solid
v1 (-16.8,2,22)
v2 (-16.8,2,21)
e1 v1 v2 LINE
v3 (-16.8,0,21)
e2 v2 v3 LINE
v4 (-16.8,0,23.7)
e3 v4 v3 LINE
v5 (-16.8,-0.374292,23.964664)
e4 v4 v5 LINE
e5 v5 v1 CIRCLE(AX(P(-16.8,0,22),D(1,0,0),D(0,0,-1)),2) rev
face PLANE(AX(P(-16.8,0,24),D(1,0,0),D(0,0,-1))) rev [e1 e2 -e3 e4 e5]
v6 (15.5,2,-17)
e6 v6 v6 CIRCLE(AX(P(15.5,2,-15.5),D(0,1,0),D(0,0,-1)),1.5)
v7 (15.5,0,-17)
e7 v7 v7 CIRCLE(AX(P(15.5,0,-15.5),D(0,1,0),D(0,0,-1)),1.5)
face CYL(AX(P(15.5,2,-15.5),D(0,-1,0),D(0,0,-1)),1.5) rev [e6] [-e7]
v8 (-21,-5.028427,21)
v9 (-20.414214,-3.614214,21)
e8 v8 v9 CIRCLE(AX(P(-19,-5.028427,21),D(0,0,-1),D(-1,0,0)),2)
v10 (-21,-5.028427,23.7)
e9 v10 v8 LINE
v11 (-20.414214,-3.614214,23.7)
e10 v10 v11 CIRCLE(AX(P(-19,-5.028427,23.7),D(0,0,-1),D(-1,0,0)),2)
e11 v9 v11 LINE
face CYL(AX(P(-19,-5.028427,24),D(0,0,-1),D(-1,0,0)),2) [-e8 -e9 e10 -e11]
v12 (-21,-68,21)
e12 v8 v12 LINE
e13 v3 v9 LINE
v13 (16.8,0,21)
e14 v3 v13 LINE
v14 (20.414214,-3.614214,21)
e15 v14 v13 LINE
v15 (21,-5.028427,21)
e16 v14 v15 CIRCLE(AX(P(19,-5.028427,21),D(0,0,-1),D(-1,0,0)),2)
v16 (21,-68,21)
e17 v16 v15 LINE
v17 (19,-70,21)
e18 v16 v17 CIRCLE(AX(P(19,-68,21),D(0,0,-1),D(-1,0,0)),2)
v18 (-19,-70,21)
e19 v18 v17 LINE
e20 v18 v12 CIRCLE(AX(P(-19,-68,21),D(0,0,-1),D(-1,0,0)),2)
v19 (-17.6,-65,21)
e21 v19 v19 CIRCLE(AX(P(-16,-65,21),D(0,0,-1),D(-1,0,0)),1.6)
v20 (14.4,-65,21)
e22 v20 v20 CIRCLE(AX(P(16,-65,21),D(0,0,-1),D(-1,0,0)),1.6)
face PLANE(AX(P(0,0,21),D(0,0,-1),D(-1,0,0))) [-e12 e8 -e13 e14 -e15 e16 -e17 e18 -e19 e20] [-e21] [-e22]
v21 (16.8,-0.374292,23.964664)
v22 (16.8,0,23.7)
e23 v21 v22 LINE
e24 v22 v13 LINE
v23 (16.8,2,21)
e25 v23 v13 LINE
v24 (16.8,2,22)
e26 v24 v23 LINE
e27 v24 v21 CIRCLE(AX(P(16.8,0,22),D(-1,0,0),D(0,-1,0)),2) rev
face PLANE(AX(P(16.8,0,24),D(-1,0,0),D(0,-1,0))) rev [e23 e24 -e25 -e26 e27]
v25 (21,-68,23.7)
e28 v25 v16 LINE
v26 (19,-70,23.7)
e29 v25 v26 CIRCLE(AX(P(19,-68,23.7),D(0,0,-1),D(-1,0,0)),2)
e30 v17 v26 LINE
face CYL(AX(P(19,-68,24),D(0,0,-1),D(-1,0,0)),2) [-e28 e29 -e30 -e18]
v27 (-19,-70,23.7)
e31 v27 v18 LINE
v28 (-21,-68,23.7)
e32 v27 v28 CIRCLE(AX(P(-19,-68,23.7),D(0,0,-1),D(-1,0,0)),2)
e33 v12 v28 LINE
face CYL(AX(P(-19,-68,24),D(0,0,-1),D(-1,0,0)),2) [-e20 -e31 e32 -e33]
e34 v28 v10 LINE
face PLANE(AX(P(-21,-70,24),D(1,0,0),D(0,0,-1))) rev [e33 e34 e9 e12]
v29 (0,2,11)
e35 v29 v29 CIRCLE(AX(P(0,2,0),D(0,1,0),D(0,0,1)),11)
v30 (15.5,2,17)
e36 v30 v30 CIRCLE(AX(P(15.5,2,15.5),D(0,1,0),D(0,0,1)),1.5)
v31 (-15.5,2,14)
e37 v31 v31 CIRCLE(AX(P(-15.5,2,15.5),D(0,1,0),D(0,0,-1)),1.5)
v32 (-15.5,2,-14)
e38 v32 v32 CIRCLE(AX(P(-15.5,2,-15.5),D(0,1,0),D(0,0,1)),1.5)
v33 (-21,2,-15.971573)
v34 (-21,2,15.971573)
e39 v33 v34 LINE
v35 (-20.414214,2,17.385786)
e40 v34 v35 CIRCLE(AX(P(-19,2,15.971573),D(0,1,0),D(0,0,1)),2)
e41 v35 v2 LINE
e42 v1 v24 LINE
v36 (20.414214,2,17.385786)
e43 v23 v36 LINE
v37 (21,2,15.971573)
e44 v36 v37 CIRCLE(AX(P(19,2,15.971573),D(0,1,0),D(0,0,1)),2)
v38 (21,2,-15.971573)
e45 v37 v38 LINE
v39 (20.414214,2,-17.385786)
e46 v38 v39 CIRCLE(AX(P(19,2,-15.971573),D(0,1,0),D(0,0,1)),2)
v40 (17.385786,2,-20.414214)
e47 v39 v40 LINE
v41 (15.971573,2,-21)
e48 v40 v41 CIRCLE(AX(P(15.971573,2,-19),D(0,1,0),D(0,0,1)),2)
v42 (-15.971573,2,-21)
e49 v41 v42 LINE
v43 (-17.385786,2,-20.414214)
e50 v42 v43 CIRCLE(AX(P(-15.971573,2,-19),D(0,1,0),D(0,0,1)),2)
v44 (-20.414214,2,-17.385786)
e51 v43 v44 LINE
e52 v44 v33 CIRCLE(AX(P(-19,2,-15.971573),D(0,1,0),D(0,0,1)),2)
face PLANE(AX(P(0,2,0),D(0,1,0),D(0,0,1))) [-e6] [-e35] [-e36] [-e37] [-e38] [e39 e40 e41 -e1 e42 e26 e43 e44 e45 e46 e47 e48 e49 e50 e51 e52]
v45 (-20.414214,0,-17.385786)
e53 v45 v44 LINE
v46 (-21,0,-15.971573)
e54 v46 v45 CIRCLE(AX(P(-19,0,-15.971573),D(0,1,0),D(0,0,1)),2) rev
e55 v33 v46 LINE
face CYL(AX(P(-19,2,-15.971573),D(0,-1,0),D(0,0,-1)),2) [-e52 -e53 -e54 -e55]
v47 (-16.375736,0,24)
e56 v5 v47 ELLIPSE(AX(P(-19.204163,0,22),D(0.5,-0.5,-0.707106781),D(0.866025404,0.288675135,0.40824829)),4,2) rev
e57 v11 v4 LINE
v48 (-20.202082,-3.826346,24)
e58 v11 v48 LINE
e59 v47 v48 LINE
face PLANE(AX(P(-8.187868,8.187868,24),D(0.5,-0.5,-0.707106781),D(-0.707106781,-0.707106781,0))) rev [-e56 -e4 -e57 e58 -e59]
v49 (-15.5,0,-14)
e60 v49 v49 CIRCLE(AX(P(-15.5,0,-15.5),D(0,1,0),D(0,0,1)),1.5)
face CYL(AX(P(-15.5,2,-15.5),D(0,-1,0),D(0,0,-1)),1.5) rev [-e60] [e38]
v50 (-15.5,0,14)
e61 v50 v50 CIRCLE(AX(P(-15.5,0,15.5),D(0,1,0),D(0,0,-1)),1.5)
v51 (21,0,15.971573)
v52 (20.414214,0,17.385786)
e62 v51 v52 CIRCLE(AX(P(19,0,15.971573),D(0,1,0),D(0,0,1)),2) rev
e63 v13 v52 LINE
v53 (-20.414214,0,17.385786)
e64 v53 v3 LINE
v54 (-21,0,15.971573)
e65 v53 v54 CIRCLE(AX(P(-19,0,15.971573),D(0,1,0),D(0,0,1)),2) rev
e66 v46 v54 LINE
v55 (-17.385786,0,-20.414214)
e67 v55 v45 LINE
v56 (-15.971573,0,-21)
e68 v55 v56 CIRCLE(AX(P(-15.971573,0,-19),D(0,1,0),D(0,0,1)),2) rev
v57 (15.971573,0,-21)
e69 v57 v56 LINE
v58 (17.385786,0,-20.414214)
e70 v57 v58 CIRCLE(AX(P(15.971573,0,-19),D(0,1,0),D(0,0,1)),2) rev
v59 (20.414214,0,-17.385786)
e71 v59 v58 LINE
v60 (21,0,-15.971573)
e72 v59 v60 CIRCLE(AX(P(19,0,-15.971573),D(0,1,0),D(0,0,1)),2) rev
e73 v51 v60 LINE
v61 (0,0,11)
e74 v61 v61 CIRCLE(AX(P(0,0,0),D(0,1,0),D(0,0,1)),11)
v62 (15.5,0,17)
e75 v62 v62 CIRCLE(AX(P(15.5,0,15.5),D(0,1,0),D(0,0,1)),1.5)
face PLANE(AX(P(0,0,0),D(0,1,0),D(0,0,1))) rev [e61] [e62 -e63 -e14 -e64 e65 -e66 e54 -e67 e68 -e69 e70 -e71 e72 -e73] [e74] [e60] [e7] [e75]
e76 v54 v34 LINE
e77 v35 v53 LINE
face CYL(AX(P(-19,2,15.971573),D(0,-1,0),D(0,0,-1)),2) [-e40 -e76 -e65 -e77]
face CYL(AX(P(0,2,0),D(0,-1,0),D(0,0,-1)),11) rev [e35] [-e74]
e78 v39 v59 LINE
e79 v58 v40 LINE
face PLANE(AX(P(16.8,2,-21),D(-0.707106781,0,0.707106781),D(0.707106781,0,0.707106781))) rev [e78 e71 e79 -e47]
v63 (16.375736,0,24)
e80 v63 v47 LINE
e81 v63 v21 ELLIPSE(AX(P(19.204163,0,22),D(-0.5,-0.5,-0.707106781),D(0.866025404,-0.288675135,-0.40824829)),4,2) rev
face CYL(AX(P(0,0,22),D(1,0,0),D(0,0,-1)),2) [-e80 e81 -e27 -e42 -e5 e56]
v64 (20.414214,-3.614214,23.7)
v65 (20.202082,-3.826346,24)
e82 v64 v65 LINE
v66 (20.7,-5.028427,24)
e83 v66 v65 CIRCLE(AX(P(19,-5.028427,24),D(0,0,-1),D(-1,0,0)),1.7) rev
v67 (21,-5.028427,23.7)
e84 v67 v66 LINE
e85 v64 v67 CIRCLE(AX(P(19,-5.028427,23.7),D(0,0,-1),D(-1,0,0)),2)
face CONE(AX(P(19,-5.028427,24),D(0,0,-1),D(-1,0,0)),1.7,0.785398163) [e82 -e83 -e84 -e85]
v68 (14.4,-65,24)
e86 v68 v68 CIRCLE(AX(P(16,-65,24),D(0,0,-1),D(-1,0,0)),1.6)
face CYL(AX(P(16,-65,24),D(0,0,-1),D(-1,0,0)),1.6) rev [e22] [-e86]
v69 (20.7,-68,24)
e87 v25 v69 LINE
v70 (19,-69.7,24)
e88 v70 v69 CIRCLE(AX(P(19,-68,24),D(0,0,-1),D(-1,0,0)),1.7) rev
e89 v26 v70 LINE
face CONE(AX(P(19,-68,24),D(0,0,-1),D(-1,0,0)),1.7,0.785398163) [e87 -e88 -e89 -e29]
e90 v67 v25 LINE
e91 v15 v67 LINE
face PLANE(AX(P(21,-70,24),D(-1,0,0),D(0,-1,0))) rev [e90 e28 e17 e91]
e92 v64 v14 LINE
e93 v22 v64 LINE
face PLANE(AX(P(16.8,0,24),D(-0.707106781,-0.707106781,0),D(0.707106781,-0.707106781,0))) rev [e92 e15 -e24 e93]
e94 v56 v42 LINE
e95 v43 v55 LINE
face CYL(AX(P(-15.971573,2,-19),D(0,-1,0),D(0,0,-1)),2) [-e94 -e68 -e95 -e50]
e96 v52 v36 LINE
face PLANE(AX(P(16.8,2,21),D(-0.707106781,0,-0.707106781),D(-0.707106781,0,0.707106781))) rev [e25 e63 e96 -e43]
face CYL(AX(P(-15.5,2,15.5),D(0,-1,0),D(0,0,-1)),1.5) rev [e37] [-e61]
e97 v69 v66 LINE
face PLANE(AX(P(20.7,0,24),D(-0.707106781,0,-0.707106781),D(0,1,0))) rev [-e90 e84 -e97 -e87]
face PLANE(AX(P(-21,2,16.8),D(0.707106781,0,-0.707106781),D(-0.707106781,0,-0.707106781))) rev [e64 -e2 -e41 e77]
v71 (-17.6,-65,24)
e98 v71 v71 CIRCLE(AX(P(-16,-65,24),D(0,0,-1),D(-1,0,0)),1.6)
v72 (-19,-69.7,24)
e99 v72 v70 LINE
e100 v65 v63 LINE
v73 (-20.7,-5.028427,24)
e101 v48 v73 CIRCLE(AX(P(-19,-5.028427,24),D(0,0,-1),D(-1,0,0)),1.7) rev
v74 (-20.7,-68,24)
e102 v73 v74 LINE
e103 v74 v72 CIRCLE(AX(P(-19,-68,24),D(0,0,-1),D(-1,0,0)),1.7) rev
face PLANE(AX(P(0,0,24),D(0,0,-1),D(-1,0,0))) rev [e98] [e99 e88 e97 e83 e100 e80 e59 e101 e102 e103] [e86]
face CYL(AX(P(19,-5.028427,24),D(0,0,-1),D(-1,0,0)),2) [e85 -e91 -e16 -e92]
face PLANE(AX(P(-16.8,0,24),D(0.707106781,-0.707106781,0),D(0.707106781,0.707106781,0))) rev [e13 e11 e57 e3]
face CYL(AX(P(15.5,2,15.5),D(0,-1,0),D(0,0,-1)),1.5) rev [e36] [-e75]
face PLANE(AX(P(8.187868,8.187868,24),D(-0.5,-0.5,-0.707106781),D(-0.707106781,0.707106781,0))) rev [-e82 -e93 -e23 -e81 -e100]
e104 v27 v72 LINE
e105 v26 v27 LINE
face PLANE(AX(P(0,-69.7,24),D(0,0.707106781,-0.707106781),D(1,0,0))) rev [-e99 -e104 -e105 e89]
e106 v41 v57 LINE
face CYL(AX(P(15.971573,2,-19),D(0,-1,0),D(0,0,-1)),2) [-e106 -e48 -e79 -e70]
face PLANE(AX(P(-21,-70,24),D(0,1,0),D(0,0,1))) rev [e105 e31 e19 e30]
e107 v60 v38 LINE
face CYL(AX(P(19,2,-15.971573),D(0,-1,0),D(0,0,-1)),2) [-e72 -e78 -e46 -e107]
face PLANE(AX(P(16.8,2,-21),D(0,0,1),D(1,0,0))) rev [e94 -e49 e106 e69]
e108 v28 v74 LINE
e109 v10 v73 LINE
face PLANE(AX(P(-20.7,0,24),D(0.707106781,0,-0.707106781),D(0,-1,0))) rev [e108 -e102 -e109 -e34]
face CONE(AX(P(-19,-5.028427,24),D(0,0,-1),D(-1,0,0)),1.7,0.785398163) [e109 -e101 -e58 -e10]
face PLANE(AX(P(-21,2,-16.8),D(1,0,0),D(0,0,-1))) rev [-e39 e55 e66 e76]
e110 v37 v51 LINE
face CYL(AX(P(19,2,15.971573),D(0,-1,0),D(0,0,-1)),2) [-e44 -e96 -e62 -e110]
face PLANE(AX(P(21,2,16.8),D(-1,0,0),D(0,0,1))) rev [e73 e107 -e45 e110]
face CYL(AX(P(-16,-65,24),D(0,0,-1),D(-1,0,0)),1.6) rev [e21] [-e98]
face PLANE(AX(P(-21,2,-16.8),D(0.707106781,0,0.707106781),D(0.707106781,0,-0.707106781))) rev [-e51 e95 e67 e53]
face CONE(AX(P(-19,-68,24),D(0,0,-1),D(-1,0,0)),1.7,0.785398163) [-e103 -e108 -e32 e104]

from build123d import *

# Parameters (mm, degrees)
SKETCH_1_R          = 11
SKETCH_1_R_2        = 1.5
EXTRUDE_1_DEPTH     = 2
EXTRUDE_2_DEPTH     = 3
FILLET_1_R          = 2
FILLET_2_R          = 2
FILLET_3_R          = 2
CHAMFER_1_SIZE      = 0.3
SKETCH_3_R          = 1.6
CUT_EXTRUDE_1_DEPTH = 3


with BuildPart() as part:
    # 草图1 → 凸台-拉伸1 (new body)
    with BuildSketch(Plane(origin=(0, 0, 0), x_dir=(1, 0, 0), z_dir=(0, 1, 0))):
        Polygon((16.8, 21), (-16.8, 21), (-21, 16.8), (-21, -16.8), (-16.8, -21), (16.8, -21), (21, -16.8), (21, 16.8), align=None)
        with Locations(Location((0, 0, 0), (0, 0, 270))):
            Circle(SKETCH_1_R, mode=Mode.SUBTRACT)
        with Locations(Location((-15.5, 15.5, 0), (0, 0, 270))):
            Circle(SKETCH_1_R_2, mode=Mode.SUBTRACT)
        with Locations(Location((15.5, 15.5, 0), (0, 0, 90))):
            Circle(SKETCH_1_R_2, mode=Mode.SUBTRACT)
        with Locations(Location((15.5, -15.5, 0), (0, 0, 270))):
            Circle(SKETCH_1_R_2, mode=Mode.SUBTRACT)
        with Locations(Location((-15.5, -15.5, 0), (0, 0, 90))):
            Circle(SKETCH_1_R_2, mode=Mode.SUBTRACT)
    extrude(amount=EXTRUDE_1_DEPTH)

    # 草图2 → 凸台-拉伸2 (add)
    with BuildSketch(Plane.XY.offset(21)):
        Polygon((-21, -70), (21, -70), (21, -4.2), (16.8, 0), (16.8, 2), (-16.8, 2), (-16.8, 0), (-21, -4.2), align=None)
    extrude(amount=EXTRUDE_2_DEPTH)

    # 圆角1
    fillet_1_edges = [part.edges().sort_by_distance(p)[0] for p in [
        (0, 2, 24),
    ]]
    fillet(fillet_1_edges, radius=FILLET_1_R)

    # 圆角2
    fillet_2_edges = [part.edges().sort_by_distance(p)[0] for p in [
        (-21, -70, 22.5),
        (21, -70, 22.5),
    ]]
    fillet(fillet_2_edges, radius=FILLET_2_R)

    # 圆角3
    fillet_3_edges = [part.edges().sort_by_distance(p)[0] for p in [
        (21, 1, -16.8),
        (21, 1, 16.8),
        (-21, 1, 16.8),
        (-21, 1, -16.8),
        (-16.8, 1, -21),
        (16.8, 1, -21),
        (-21, -4.2, 22.5),
        (21, -4.2, 22.5),
    ]]
    fillet(fillet_3_edges, radius=FILLET_3_R)

    # 倒角1
    # the kernel refuses this chamfer: 0.3 mm, written as the material it takes off along each edge
    with BuildSketch(Plane(origin=(20.414213562, -3.614213562, 24), x_dir=(-0.7068394360706586, -0.7068394360706884, 0.027495876610584332), z_dir=(-0.7071067811865624, 0.7071067811865326, 0))) as chamfer_1_piece_1_section:
        Polygon((CHAMFER_1_SIZE * 0.999621916911, -CHAMFER_1_SIZE * 0.0274958766106), (-CHAMFER_1_SIZE * 0.0274958766106, -CHAMFER_1_SIZE * 0.999621916911), (0, 0), align=None)
    chamfer_1_piece_1 = extrude(amount=5.882774734, mode=Mode.PRIVATE)
    chamfer_1_piece_1 = split(chamfer_1_piece_1, bisect_by=Plane(origin=(16.8, -3.46784849, 23.913969067), z_dir=(1, 0, 0)), keep=Keep.TOP, mode=Mode.PRIVATE)
    add(chamfer_1_piece_1, mode=Mode.SUBTRACT)
    with BuildSketch(Plane(origin=(20.414213562, -3.614213562, 24), x_dir=(-0.7068394360706586, -0.7068394360706884, 0.027495876610584332), z_dir=(-0.7071067811865624, 0.7071067811865326, 0))) as chamfer_1_piece_2_section:
        Polygon((CHAMFER_1_SIZE * 0.999621916911, -CHAMFER_1_SIZE * 0.0274958766106), (-CHAMFER_1_SIZE * 0.0274958766106, -CHAMFER_1_SIZE * 0.999621916911), (0, 0), align=None)
    chamfer_1_piece_2 = extrude(amount=5.882774734, mode=Mode.PRIVATE)
    chamfer_1_piece_2 = chamfer_1_piece_2 - Plane(origin=(16.713155259, 0, 22), x_dir=(0, 1, 0), z_dir=(-1, 0, 0)) * Cylinder(2, 13, mode=Mode.PRIVATE)
    add(chamfer_1_piece_2, mode=Mode.SUBTRACT)
    with BuildSketch(Plane(origin=(-21, -5.028427125, 24), x_dir=(0.9996219169112968, 0, 0.027495876610584464), z_dir=(0, -1, 0)), Plane(origin=(21, -68, 24), x_dir=(-0.9996219169112968, 0, 0.027495876610584464), z_dir=(0, 1, 0))) as chamfer_1_piece_3:
        Polygon((CHAMFER_1_SIZE * 0.999621916911, -CHAMFER_1_SIZE * 0.0274958766106), (-CHAMFER_1_SIZE * 0.0274958766106, -CHAMFER_1_SIZE * 0.999621916911), (0, 0), align=None)
    extrude(amount=62.971572875, mode=Mode.SUBTRACT)
    with BuildSketch(Plane(origin=(-19, -5.028427125, 24), x_dir=(-0.7071067811865533, 0.7071067811865418, 0), z_dir=(0.7071067811865418, 0.7071067811865533, 0))) as chamfer_1_piece_4:
        Polygon((2 - CHAMFER_1_SIZE, 0), (2, -CHAMFER_1_SIZE), (2, 0), align=None)
    revolve(axis=Axis((-19, -5.028427125, 24), (0, 0, 1)), revolution_arc=45, mode=Mode.SUBTRACT)
    with BuildSketch(Plane(origin=(19, -5.028427125, 24), x_dir=(1, 0, 0), z_dir=(0, -1, 0))) as chamfer_1_piece_5:
        Polygon((2 - CHAMFER_1_SIZE, 0), (2, -CHAMFER_1_SIZE), (2, 0), align=None)
    revolve(axis=Axis((19, -5.028427125, 24), (0, 0, 1)), revolution_arc=45, mode=Mode.SUBTRACT)
    with BuildSketch(Plane(origin=(-16.254463656, 0.545536344, 24), x_dir=(0.7068394360706796, -0.7068394360706673, 0.027495876610584523), z_dir=(-0.7071067811865415, -0.7071067811865537, 0))) as chamfer_1_piece_6_section:
        Polygon((CHAMFER_1_SIZE * 0.999621916911, -CHAMFER_1_SIZE * 0.0274958766106), (-CHAMFER_1_SIZE * 0.0274958766106, -CHAMFER_1_SIZE * 0.999621916911), (0, 0), align=None)
    chamfer_1_piece_6 = extrude(amount=5.882774734, mode=Mode.PRIVATE)
    chamfer_1_piece_6 = split(chamfer_1_piece_6, bisect_by=Plane(origin=(-16.8, -0.406139504, 23.857619538), z_dir=(-1, 0, 0)), keep=Keep.TOP, mode=Mode.PRIVATE)
    add(chamfer_1_piece_6, mode=Mode.SUBTRACT)
    with BuildSketch(Plane(origin=(-16.254463656, 0.545536344, 24), x_dir=(0.7068394360706796, -0.7068394360706673, 0.027495876610584523), z_dir=(-0.7071067811865415, -0.7071067811865537, 0))) as chamfer_1_piece_7_section:
        Polygon((CHAMFER_1_SIZE * 0.999621916911, -CHAMFER_1_SIZE * 0.0274958766106), (-CHAMFER_1_SIZE * 0.0274958766106, -CHAMFER_1_SIZE * 0.999621916911), (0, 0), align=None)
    chamfer_1_piece_7 = extrude(amount=5.882774734, mode=Mode.PRIVATE)
    chamfer_1_piece_7 = chamfer_1_piece_7 - Plane(origin=(-16.713155259, 0, 22), x_dir=(0, 1, 0), z_dir=(-1, 0, 0)) * Cylinder(2, 13, mode=Mode.PRIVATE)
    add(chamfer_1_piece_7, mode=Mode.SUBTRACT)
    with BuildSketch(Plane(origin=(-19, -70, 24), x_dir=(0, 0.9996219169112968, 0.0274958766105851), z_dir=(1, 0, 0))) as chamfer_1_piece_8:
        Polygon((CHAMFER_1_SIZE * 0.999621916911, -CHAMFER_1_SIZE * 0.0274958766106), (-CHAMFER_1_SIZE * 0.0274958766106, -CHAMFER_1_SIZE * 0.999621916911), (0, 0), align=None)
    extrude(amount=38, mode=Mode.SUBTRACT)
    with BuildSketch(Plane(origin=(19, -68, 24), x_dir=(1, 0, 0), z_dir=(0, 1, 0))) as chamfer_1_piece_9:
        Polygon((2 - CHAMFER_1_SIZE, 0), (2, CHAMFER_1_SIZE), (2, 0), align=None)
    revolve(axis=Axis((19, -68, 24), (0, 0, -1)), revolution_arc=90, mode=Mode.SUBTRACT)
    with BuildSketch(Plane(origin=(-19, -68, 24), x_dir=(-1, 0, 0), z_dir=(0, 1, 0))) as chamfer_1_piece_10:
        Polygon((2 - CHAMFER_1_SIZE, 0), (2, -CHAMFER_1_SIZE), (2, 0), align=None)
    revolve(axis=Axis((-19, -68, 24), (0, 0, 1)), revolution_arc=90, mode=Mode.SUBTRACT)

    # 草图3 → 切除-拉伸1 (cut)
    with BuildSketch(Plane(origin=(0, 0, 21), x_dir=(-1, 0, 0), z_dir=(0, 0, -1))):
        with Locations((-16, -65)):
            Circle(SKETCH_3_R)
        with Locations((16, -65)):
            Circle(SKETCH_3_R)
    extrude(amount=-CUT_EXTRUDE_1_DEPTH, mode=Mode.SUBTRACT)


solid = part.part
